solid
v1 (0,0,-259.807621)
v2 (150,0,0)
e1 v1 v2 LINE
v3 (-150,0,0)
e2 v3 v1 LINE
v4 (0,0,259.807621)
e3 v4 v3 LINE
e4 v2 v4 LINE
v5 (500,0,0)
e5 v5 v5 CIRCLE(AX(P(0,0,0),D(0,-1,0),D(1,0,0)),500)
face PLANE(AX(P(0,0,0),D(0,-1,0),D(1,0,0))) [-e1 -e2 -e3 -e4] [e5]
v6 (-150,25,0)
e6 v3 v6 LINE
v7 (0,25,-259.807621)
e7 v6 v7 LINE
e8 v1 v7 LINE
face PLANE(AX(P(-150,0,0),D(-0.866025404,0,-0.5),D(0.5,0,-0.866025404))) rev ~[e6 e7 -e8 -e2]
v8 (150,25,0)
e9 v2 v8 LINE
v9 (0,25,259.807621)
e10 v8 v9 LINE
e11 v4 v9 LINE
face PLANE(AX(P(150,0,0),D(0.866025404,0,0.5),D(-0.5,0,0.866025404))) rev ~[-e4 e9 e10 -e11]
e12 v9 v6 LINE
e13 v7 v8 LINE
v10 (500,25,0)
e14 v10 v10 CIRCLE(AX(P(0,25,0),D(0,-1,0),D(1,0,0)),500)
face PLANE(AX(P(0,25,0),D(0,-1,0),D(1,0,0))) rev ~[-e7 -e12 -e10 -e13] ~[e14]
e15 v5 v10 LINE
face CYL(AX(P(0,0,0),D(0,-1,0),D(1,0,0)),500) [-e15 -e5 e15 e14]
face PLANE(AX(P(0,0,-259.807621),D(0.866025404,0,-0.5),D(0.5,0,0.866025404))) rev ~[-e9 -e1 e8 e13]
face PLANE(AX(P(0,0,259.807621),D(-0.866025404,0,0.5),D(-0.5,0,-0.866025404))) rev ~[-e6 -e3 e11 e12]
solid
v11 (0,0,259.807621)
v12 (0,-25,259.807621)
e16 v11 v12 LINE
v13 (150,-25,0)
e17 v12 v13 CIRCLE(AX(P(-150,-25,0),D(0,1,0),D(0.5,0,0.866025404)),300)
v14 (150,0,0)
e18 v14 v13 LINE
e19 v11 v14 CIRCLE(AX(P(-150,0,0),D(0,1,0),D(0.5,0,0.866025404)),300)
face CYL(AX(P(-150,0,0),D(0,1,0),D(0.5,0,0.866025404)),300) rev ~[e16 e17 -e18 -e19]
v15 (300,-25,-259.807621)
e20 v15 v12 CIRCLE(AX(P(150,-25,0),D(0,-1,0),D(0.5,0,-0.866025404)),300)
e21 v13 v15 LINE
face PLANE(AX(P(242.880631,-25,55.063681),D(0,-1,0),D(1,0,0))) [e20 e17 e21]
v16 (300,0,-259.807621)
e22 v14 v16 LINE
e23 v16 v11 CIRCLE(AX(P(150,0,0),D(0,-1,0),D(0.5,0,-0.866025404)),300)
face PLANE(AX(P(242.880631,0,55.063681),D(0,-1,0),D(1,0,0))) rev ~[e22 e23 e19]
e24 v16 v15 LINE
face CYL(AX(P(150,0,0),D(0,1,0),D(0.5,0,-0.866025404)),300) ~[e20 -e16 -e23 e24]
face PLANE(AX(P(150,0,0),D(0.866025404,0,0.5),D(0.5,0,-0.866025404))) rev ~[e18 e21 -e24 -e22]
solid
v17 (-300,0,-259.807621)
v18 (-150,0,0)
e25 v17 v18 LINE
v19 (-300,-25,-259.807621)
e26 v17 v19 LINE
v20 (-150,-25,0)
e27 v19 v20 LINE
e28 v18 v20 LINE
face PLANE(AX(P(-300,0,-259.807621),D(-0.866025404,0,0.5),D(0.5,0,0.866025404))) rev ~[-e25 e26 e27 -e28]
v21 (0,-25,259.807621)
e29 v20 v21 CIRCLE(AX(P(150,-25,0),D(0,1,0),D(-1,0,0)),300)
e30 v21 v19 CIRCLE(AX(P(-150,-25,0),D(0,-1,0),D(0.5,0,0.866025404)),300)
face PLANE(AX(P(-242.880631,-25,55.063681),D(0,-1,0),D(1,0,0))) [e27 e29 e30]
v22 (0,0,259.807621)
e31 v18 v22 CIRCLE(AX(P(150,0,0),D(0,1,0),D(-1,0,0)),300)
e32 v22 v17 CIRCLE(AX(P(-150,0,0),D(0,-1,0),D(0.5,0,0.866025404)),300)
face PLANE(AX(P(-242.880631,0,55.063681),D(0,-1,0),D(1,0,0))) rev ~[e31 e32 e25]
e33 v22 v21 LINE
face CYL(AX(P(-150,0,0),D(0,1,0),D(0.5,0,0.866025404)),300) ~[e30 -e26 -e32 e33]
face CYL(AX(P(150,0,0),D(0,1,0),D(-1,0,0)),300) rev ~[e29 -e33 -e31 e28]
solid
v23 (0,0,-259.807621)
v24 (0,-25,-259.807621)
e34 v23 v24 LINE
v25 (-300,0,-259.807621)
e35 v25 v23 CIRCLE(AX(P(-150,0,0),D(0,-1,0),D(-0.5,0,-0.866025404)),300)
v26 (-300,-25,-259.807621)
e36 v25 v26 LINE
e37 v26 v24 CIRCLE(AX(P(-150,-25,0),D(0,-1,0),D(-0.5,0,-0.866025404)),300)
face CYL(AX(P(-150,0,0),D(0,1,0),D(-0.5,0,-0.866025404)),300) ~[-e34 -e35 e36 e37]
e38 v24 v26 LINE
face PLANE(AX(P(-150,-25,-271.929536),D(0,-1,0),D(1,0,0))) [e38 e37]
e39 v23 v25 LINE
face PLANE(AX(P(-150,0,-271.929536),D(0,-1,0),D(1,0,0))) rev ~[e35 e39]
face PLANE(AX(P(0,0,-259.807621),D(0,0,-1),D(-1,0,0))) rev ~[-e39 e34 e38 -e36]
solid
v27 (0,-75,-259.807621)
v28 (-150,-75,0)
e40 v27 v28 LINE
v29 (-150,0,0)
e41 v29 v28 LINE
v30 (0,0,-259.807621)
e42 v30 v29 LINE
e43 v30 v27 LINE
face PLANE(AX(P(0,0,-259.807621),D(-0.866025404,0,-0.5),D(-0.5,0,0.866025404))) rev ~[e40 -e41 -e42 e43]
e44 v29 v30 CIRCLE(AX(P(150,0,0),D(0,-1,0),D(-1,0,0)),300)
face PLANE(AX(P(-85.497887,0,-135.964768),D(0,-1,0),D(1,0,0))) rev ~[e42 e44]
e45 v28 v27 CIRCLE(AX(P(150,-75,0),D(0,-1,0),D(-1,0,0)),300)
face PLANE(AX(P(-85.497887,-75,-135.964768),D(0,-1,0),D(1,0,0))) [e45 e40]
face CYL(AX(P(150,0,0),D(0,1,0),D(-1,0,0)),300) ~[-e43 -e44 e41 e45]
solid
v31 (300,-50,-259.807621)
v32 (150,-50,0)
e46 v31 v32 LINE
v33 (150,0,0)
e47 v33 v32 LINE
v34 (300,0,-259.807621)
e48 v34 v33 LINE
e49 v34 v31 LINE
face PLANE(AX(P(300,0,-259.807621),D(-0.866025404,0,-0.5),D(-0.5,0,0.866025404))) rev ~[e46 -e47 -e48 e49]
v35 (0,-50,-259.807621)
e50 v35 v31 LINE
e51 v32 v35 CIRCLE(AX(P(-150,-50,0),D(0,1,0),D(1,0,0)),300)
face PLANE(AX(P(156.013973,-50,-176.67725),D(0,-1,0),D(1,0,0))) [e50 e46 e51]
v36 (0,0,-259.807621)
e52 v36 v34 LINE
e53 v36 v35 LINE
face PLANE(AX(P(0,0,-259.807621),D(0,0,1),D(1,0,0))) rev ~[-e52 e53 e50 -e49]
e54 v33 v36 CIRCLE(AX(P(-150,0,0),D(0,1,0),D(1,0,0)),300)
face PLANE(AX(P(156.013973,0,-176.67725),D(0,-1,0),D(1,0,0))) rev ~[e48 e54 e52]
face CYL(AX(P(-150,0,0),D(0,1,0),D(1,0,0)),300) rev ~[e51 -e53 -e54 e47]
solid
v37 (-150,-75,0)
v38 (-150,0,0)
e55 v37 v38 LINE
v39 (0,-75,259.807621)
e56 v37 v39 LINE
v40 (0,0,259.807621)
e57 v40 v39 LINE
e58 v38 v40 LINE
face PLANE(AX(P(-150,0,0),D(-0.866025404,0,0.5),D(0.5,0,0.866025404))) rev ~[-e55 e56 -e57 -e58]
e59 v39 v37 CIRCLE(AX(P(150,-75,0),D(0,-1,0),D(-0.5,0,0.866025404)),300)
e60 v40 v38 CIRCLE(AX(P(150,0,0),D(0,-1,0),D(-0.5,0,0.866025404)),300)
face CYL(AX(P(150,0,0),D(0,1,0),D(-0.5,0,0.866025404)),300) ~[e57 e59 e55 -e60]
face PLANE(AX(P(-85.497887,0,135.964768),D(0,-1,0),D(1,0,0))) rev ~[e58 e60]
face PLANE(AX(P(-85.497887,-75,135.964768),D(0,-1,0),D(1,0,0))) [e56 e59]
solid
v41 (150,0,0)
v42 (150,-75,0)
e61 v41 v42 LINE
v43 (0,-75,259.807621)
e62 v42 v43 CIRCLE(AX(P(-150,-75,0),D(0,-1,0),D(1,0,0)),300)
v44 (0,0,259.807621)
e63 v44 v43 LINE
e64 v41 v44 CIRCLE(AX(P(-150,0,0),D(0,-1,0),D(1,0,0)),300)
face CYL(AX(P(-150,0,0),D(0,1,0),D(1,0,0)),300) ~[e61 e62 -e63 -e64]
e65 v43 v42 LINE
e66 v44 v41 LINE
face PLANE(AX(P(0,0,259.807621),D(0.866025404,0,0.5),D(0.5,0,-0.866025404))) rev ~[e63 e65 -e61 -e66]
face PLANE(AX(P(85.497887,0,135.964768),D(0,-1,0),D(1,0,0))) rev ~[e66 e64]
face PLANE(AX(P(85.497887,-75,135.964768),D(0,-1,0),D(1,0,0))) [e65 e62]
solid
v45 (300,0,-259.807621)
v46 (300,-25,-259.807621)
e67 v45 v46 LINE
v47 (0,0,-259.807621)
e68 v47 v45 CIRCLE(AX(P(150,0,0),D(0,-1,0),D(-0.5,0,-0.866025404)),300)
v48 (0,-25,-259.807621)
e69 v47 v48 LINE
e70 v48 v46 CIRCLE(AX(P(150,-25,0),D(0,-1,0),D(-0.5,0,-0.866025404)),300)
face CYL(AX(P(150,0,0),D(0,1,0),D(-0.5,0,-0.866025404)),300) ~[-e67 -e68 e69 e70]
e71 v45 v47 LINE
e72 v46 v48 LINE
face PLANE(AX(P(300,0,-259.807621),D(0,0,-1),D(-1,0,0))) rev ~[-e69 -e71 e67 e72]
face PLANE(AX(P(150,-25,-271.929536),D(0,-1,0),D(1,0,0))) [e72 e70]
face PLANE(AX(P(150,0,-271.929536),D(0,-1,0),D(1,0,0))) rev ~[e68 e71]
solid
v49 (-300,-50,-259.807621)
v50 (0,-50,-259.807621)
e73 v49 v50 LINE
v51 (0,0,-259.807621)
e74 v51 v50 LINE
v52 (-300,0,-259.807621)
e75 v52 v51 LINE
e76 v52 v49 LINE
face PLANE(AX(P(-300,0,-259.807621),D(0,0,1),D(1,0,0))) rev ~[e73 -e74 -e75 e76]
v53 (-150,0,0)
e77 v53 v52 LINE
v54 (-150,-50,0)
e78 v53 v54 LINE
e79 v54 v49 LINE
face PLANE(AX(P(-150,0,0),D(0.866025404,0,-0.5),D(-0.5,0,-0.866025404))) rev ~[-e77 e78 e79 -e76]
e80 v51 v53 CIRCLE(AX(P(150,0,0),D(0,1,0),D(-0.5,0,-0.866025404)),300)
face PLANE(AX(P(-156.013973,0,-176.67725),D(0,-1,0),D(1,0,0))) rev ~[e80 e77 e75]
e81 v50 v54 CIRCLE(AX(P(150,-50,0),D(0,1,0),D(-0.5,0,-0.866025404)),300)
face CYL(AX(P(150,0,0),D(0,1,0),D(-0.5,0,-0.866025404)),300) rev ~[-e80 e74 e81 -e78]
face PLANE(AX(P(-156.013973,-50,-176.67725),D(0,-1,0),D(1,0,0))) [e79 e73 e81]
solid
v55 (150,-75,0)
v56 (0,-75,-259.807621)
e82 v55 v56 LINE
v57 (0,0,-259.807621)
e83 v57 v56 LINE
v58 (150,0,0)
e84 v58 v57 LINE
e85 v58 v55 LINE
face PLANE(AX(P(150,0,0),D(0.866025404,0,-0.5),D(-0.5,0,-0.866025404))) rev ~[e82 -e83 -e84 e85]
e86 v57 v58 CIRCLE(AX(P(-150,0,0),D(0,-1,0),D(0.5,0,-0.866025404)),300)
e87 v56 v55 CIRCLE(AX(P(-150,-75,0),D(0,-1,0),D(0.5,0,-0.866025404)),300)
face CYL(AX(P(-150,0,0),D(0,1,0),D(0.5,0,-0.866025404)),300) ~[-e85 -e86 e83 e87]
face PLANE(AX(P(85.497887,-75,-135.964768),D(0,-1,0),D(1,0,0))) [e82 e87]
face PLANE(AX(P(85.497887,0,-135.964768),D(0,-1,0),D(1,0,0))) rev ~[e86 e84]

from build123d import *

# Parameters (mm, degrees)
F0_R     = 500
F2_DEPTH = 25
F3_DEPTH = 25
F4_DEPTH = 50
F5_DEPTH = 75
F6_DEPTH = 300


with BuildPart() as f2:
    # F0 (on Front) → F2 (new body)
    with BuildSketch(Plane.XZ):
        Circle(F0_R)
    extrude(amount=-F2_DEPTH)

    # F1 (on Front) → F6 (cut)
    with BuildSketch(Plane.XZ):
        Polygon((0, 0), (0, 259.8076211353), (-150, 0), align=None)
        Polygon((0, 0), (150, 0), (0, 259.8076211353), align=None)
        Polygon((0, -259.8076211353), (150, 0), (0, 0), align=None)
        Polygon((-150, 0), (0, -259.8076211353), (0, 0), align=None)
    extrude(amount=-F6_DEPTH, mode=Mode.SUBTRACT)


with BuildPart() as f3:
    # F1 (on Front) → F3 (new body)
    with BuildSketch(Plane.XZ):
        with BuildLine():
            ThreePointArc((0, 259.8076211353), (109.8076211353, 150), (150, 0))
            Line((150, 0), (300, -259.8076211353))
            ThreePointArc((300, -259.8076211353), (409.8076211353, -150), (450, 0))
            ThreePointArc((450, 0), (300, 259.8076211353), (0, 259.8076211353))
        make_face()
    extrude(amount=F3_DEPTH)


with BuildPart() as f3b:
    # F1 (on Front) → F3, piece 2 (new body)
    with BuildSketch(Plane.XZ):
        with BuildLine():
            ThreePointArc((-150, 0), (-109.8076211353, 150), (0, 259.8076211353))
            ThreePointArc((0, 259.8076211353), (-409.8076211353, 150), (-300, -259.8076211353))
            Line((-300, -259.8076211353), (-150, 0))
        make_face()
    extrude(amount=F3_DEPTH)


with BuildPart() as f3c:
    # F1 (on Front) → F3, piece 3 (new body)
    with BuildSketch(Plane.XZ):
        with BuildLine():
            Line((300, -259.8076211353), (0, -259.8076211353))
            ThreePointArc((0, -259.8076211353), (150, -300), (300, -259.8076211353))
        make_face()
    extrude(amount=F3_DEPTH)


with BuildPart() as f3d:
    # F1 (on Front) → F3, piece 4 (new body)
    with BuildSketch(Plane.XZ):
        with BuildLine():
            ThreePointArc((-300, -259.8076211353), (-150, -300), (0, -259.8076211353))
            Line((0, -259.8076211353), (-300, -259.8076211353))
        make_face()
    extrude(amount=F3_DEPTH)


with BuildPart() as f4:
    # F1 (on Front) → F4 (new body)
    with BuildSketch(Plane.XZ):
        with BuildLine():
            Line((300, -259.8076211353), (150, 0))
            ThreePointArc((150, 0), (109.8076211353, -150), (0, -259.8076211353))
            Line((0, -259.8076211353), (300, -259.8076211353))
        make_face()
    extrude(amount=F4_DEPTH)


with BuildPart() as f4b:
    # F1 (on Front) → F4, piece 2 (new body)
    with BuildSketch(Plane.XZ):
        with BuildLine():
            Line((-150, 0), (0, 259.8076211353))
            ThreePointArc((0, 259.8076211353), (-109.8076211353, 150), (-150, 0))
        make_face()
    extrude(amount=F4_DEPTH)

    # F1 (on Front) → F5, piece 3 (join)
    with BuildSketch(Plane.XZ):
        with BuildLine():
            Line((-150, 0), (0, 259.8076211353))
            ThreePointArc((0, 259.8076211353), (-109.8076211353, 150), (-150, 0))
        make_face()
    extrude(amount=F5_DEPTH)


with BuildPart() as f4c:
    # F1 (on Front) → F4, piece 3 (new body)
    with BuildSketch(Plane.XZ):
        with BuildLine():
            Line((-300, -259.8076211353), (0, -259.8076211353))
            ThreePointArc((0, -259.8076211353), (-109.8076211353, -150), (-150, 0))
            Line((-150, 0), (-300, -259.8076211353))
        make_face()
    extrude(amount=F4_DEPTH)


with BuildPart() as f5:
    # F1 (on Front) → F5 (new body)
    with BuildSketch(Plane.XZ):
        with BuildLine():
            Line((0, 259.8076211353), (150, 0))
            ThreePointArc((150, 0), (109.8076211353, 150), (0, 259.8076211353))
        make_face()
    extrude(amount=F5_DEPTH)


with BuildPart() as f5b:
    # F1 (on Front) → F5, piece 2 (new body)
    with BuildSketch(Plane.XZ):
        with BuildLine():
            ThreePointArc((0, -259.8076211353), (109.8076211353, -150), (150, 0))
            Line((150, 0), (0, -259.8076211353))
        make_face()
    extrude(amount=F5_DEPTH)


with BuildPart() as f5c:
    # F1 (on Front) → F5, piece 4 (new body)
    with BuildSketch(Plane.XZ):
        with BuildLine():
            ThreePointArc((-150, 0), (-109.8076211353, -150), (0, -259.8076211353))
            Line((0, -259.8076211353), (-150, 0))
        make_face()
    extrude(amount=F5_DEPTH)


solid = Compound([f2.part, f3.part, f3b.part, f3c.part, f3d.part, f4.part, f4b.part, f4c.part, f5.part, f5b.part, f5c.part])
